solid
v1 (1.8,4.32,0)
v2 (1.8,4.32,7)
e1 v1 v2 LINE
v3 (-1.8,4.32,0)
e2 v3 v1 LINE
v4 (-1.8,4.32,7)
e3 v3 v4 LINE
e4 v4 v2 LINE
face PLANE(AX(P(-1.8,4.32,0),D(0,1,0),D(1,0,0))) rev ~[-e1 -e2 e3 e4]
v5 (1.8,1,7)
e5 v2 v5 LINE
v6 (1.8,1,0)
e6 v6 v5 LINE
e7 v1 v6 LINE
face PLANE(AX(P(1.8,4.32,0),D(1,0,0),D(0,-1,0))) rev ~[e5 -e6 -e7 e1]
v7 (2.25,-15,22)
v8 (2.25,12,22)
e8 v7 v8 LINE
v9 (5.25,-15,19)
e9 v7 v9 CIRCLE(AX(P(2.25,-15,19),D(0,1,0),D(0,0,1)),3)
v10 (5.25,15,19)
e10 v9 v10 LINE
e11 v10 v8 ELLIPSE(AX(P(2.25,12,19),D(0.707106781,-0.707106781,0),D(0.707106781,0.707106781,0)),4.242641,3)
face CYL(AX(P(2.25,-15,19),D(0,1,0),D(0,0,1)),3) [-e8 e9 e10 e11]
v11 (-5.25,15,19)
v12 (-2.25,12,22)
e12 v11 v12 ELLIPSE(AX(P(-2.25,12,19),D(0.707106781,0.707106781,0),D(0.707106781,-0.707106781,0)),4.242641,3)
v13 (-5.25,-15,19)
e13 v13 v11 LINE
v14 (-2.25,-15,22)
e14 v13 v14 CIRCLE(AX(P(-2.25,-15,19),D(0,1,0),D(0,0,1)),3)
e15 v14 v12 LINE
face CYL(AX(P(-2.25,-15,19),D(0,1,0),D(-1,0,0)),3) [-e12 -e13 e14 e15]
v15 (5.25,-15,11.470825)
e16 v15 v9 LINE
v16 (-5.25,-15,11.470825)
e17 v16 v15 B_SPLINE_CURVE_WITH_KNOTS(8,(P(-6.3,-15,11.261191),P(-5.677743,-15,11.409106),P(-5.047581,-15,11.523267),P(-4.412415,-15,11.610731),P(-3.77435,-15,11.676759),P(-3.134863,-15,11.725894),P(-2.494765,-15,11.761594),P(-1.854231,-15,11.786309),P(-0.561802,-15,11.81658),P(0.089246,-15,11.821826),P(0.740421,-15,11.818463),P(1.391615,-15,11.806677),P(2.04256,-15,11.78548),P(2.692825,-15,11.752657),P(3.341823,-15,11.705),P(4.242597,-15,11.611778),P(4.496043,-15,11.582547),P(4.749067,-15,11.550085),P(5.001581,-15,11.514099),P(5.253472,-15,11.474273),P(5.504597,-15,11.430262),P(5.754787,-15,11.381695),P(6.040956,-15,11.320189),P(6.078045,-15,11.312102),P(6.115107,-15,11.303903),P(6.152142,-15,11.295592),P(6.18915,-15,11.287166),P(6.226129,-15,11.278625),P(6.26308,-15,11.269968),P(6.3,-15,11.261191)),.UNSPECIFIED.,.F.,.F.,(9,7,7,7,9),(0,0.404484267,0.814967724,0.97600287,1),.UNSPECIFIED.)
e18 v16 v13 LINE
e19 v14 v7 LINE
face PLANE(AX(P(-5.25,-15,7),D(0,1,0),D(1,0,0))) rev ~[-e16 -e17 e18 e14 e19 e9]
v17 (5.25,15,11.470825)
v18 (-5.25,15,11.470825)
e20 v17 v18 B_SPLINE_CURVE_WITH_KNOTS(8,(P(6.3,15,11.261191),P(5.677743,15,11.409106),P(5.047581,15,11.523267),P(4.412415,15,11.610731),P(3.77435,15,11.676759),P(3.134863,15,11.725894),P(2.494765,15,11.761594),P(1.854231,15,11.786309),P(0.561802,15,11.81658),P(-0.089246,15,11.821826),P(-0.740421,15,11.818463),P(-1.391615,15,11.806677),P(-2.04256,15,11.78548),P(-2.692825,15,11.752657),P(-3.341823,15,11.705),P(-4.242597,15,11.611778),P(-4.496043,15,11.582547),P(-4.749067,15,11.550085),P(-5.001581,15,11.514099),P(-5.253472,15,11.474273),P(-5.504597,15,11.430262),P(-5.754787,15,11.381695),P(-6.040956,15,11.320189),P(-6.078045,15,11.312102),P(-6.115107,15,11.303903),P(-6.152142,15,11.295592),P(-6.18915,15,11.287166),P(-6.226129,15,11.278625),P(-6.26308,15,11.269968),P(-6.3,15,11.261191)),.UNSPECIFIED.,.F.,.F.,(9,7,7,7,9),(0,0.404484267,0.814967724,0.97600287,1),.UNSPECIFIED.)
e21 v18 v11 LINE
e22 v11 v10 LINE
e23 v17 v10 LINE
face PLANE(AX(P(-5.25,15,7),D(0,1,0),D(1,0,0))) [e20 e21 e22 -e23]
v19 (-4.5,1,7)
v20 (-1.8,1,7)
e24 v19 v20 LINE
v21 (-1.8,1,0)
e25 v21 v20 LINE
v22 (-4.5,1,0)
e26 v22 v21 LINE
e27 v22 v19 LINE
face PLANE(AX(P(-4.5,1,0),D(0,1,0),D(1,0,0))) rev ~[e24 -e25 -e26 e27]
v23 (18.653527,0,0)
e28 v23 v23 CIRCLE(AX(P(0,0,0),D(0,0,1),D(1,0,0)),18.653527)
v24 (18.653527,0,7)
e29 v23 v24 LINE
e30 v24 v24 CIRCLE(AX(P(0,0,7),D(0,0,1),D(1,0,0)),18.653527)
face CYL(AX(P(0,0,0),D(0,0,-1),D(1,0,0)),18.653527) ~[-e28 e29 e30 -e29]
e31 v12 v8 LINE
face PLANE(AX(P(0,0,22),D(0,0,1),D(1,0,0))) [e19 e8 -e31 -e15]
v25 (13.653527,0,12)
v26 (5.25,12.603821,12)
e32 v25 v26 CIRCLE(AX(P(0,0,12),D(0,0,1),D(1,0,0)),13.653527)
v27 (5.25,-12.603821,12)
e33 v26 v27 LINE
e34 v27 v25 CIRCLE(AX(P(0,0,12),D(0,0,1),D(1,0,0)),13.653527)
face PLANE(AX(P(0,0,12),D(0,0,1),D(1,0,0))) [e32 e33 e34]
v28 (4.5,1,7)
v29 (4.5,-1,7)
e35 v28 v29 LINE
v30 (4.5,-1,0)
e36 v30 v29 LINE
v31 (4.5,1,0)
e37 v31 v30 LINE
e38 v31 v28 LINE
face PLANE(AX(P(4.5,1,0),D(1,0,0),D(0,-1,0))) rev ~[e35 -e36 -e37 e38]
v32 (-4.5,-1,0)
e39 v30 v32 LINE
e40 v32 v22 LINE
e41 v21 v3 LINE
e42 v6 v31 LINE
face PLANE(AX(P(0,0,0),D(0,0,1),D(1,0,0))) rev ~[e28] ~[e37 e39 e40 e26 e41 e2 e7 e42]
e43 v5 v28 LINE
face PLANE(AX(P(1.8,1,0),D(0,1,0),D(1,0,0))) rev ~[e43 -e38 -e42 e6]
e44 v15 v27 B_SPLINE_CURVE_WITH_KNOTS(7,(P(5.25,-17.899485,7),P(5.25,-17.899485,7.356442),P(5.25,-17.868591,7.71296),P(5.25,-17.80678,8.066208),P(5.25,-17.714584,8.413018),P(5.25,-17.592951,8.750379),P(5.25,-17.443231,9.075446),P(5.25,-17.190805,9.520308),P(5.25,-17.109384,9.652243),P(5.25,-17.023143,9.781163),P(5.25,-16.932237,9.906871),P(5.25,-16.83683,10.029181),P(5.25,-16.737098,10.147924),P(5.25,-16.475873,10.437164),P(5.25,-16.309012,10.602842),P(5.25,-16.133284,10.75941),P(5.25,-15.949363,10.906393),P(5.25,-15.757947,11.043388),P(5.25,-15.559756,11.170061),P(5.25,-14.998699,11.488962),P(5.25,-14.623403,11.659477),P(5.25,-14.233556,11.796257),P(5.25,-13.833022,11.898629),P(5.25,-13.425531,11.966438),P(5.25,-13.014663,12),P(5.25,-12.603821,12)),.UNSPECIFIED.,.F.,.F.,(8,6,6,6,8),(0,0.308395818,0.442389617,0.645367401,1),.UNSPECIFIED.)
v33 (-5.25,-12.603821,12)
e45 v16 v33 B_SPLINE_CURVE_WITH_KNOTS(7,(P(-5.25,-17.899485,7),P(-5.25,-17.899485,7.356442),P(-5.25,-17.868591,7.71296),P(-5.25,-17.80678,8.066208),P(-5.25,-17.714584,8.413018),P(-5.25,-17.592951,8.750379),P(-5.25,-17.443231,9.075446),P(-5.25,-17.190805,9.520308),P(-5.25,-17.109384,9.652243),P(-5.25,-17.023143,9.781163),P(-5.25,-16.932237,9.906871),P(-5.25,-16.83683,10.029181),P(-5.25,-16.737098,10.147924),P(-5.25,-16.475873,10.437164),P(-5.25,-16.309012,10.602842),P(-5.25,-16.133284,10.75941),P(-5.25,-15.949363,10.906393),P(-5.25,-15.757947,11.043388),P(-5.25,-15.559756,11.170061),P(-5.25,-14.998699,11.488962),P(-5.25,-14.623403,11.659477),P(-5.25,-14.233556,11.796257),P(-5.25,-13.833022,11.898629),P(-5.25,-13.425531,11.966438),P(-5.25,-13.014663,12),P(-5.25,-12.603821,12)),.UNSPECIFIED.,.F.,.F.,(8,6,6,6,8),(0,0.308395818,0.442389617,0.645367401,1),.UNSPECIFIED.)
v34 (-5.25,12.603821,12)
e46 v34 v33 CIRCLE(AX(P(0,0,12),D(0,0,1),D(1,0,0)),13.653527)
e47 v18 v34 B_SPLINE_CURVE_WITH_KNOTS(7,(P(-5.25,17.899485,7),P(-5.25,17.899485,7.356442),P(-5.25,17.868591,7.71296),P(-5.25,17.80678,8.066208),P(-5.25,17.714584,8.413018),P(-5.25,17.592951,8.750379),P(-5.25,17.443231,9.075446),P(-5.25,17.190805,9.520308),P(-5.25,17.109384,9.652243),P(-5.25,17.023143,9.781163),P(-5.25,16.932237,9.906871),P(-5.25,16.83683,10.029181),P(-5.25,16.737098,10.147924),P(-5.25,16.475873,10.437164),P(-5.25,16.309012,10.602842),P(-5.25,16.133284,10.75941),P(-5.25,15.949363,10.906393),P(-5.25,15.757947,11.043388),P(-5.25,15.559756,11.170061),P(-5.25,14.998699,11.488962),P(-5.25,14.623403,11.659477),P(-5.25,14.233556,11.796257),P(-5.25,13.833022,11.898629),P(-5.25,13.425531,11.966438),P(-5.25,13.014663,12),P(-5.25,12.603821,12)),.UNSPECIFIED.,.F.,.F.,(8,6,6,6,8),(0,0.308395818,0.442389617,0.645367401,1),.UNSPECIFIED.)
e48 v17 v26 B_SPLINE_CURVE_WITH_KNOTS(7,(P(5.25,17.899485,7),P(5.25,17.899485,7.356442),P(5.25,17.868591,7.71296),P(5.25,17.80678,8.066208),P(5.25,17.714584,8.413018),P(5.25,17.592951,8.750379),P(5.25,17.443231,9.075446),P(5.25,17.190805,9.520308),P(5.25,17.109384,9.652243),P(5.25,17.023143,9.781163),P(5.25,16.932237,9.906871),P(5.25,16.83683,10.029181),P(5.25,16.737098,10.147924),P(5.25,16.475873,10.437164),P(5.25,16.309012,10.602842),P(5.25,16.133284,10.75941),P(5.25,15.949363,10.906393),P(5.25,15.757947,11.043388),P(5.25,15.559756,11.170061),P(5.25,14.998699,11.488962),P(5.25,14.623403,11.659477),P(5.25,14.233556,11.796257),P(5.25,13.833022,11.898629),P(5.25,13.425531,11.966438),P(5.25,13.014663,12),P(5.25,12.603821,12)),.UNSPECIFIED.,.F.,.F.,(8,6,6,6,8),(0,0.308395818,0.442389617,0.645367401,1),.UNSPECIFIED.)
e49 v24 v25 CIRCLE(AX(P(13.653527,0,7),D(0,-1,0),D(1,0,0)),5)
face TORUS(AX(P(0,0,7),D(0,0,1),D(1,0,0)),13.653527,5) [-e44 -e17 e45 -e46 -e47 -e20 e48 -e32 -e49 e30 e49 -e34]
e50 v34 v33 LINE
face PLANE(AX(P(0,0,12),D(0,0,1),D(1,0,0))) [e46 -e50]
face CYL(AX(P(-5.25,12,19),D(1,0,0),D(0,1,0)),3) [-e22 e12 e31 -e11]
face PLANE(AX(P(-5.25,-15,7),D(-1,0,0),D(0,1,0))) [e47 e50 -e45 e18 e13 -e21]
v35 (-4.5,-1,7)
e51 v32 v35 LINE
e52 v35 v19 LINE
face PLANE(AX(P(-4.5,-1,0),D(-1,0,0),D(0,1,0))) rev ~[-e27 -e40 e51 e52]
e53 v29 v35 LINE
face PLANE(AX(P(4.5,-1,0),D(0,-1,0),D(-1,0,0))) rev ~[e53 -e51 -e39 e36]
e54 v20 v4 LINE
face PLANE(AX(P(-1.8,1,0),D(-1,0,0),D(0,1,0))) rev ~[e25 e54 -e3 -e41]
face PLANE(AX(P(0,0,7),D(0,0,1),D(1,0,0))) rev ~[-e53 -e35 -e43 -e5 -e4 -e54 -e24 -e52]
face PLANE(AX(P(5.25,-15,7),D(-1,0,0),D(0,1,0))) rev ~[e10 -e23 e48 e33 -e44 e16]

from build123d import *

# Parameters (mm, degrees)
F0_R     = 7
F1_DEPTH = 12
F0_R_2   = 18.6535272591
F2_DEPTH = 12
F3_R     = 5
F5_W     = 10.5
F5_H     = 30
F6_DEPTH = 15
F7_R     = 3


# Not quite as in the source:
# - a feature names something its author has since deleted; it is built from what else it names


with BuildPart() as f1:
    # F0 (on Top) → F1 (new body)
    with BuildSketch(Plane.XY):
        Circle(F0_R)
        Polygon((1.8, 1), (4.5, 1), (4.5, -1), (1.8, -1), (-1.8, -1), (-4.5, -1), (-4.5, 1), (-1.8, 1), (-1.8, 4.32), (1.8, 4.32), align=None, mode=Mode.SUBTRACT)
    extrude(amount=F1_DEPTH)

    # F0 (on Top) → F2 (join)
    with BuildSketch(Plane.XY):
        Circle(F0_R_2)
        Circle(F0_R, mode=Mode.SUBTRACT)
    extrude(amount=F2_DEPTH)

    # F3
    f3_edges = [f1.edges().sort_by_distance(p)[0] for p in [
        (-18.653527, 0, 12),
    ]]
    fillet(f3_edges, radius=F3_R)

    # F5 (on offset) → F6 (join)
    with BuildSketch(Plane.XY.offset(7)):
        Rectangle(F5_W, F5_H)
    extrude(amount=F6_DEPTH)

    # F7
    f7_edges = [f1.edges().sort_by_distance(p)[0] for p in [
        (0, 15, 22),
        (-5.25, 0, 22),
        (5.25, 0, 22),
    ]]
    fillet(f7_edges, radius=F7_R)


solid = f1.part
